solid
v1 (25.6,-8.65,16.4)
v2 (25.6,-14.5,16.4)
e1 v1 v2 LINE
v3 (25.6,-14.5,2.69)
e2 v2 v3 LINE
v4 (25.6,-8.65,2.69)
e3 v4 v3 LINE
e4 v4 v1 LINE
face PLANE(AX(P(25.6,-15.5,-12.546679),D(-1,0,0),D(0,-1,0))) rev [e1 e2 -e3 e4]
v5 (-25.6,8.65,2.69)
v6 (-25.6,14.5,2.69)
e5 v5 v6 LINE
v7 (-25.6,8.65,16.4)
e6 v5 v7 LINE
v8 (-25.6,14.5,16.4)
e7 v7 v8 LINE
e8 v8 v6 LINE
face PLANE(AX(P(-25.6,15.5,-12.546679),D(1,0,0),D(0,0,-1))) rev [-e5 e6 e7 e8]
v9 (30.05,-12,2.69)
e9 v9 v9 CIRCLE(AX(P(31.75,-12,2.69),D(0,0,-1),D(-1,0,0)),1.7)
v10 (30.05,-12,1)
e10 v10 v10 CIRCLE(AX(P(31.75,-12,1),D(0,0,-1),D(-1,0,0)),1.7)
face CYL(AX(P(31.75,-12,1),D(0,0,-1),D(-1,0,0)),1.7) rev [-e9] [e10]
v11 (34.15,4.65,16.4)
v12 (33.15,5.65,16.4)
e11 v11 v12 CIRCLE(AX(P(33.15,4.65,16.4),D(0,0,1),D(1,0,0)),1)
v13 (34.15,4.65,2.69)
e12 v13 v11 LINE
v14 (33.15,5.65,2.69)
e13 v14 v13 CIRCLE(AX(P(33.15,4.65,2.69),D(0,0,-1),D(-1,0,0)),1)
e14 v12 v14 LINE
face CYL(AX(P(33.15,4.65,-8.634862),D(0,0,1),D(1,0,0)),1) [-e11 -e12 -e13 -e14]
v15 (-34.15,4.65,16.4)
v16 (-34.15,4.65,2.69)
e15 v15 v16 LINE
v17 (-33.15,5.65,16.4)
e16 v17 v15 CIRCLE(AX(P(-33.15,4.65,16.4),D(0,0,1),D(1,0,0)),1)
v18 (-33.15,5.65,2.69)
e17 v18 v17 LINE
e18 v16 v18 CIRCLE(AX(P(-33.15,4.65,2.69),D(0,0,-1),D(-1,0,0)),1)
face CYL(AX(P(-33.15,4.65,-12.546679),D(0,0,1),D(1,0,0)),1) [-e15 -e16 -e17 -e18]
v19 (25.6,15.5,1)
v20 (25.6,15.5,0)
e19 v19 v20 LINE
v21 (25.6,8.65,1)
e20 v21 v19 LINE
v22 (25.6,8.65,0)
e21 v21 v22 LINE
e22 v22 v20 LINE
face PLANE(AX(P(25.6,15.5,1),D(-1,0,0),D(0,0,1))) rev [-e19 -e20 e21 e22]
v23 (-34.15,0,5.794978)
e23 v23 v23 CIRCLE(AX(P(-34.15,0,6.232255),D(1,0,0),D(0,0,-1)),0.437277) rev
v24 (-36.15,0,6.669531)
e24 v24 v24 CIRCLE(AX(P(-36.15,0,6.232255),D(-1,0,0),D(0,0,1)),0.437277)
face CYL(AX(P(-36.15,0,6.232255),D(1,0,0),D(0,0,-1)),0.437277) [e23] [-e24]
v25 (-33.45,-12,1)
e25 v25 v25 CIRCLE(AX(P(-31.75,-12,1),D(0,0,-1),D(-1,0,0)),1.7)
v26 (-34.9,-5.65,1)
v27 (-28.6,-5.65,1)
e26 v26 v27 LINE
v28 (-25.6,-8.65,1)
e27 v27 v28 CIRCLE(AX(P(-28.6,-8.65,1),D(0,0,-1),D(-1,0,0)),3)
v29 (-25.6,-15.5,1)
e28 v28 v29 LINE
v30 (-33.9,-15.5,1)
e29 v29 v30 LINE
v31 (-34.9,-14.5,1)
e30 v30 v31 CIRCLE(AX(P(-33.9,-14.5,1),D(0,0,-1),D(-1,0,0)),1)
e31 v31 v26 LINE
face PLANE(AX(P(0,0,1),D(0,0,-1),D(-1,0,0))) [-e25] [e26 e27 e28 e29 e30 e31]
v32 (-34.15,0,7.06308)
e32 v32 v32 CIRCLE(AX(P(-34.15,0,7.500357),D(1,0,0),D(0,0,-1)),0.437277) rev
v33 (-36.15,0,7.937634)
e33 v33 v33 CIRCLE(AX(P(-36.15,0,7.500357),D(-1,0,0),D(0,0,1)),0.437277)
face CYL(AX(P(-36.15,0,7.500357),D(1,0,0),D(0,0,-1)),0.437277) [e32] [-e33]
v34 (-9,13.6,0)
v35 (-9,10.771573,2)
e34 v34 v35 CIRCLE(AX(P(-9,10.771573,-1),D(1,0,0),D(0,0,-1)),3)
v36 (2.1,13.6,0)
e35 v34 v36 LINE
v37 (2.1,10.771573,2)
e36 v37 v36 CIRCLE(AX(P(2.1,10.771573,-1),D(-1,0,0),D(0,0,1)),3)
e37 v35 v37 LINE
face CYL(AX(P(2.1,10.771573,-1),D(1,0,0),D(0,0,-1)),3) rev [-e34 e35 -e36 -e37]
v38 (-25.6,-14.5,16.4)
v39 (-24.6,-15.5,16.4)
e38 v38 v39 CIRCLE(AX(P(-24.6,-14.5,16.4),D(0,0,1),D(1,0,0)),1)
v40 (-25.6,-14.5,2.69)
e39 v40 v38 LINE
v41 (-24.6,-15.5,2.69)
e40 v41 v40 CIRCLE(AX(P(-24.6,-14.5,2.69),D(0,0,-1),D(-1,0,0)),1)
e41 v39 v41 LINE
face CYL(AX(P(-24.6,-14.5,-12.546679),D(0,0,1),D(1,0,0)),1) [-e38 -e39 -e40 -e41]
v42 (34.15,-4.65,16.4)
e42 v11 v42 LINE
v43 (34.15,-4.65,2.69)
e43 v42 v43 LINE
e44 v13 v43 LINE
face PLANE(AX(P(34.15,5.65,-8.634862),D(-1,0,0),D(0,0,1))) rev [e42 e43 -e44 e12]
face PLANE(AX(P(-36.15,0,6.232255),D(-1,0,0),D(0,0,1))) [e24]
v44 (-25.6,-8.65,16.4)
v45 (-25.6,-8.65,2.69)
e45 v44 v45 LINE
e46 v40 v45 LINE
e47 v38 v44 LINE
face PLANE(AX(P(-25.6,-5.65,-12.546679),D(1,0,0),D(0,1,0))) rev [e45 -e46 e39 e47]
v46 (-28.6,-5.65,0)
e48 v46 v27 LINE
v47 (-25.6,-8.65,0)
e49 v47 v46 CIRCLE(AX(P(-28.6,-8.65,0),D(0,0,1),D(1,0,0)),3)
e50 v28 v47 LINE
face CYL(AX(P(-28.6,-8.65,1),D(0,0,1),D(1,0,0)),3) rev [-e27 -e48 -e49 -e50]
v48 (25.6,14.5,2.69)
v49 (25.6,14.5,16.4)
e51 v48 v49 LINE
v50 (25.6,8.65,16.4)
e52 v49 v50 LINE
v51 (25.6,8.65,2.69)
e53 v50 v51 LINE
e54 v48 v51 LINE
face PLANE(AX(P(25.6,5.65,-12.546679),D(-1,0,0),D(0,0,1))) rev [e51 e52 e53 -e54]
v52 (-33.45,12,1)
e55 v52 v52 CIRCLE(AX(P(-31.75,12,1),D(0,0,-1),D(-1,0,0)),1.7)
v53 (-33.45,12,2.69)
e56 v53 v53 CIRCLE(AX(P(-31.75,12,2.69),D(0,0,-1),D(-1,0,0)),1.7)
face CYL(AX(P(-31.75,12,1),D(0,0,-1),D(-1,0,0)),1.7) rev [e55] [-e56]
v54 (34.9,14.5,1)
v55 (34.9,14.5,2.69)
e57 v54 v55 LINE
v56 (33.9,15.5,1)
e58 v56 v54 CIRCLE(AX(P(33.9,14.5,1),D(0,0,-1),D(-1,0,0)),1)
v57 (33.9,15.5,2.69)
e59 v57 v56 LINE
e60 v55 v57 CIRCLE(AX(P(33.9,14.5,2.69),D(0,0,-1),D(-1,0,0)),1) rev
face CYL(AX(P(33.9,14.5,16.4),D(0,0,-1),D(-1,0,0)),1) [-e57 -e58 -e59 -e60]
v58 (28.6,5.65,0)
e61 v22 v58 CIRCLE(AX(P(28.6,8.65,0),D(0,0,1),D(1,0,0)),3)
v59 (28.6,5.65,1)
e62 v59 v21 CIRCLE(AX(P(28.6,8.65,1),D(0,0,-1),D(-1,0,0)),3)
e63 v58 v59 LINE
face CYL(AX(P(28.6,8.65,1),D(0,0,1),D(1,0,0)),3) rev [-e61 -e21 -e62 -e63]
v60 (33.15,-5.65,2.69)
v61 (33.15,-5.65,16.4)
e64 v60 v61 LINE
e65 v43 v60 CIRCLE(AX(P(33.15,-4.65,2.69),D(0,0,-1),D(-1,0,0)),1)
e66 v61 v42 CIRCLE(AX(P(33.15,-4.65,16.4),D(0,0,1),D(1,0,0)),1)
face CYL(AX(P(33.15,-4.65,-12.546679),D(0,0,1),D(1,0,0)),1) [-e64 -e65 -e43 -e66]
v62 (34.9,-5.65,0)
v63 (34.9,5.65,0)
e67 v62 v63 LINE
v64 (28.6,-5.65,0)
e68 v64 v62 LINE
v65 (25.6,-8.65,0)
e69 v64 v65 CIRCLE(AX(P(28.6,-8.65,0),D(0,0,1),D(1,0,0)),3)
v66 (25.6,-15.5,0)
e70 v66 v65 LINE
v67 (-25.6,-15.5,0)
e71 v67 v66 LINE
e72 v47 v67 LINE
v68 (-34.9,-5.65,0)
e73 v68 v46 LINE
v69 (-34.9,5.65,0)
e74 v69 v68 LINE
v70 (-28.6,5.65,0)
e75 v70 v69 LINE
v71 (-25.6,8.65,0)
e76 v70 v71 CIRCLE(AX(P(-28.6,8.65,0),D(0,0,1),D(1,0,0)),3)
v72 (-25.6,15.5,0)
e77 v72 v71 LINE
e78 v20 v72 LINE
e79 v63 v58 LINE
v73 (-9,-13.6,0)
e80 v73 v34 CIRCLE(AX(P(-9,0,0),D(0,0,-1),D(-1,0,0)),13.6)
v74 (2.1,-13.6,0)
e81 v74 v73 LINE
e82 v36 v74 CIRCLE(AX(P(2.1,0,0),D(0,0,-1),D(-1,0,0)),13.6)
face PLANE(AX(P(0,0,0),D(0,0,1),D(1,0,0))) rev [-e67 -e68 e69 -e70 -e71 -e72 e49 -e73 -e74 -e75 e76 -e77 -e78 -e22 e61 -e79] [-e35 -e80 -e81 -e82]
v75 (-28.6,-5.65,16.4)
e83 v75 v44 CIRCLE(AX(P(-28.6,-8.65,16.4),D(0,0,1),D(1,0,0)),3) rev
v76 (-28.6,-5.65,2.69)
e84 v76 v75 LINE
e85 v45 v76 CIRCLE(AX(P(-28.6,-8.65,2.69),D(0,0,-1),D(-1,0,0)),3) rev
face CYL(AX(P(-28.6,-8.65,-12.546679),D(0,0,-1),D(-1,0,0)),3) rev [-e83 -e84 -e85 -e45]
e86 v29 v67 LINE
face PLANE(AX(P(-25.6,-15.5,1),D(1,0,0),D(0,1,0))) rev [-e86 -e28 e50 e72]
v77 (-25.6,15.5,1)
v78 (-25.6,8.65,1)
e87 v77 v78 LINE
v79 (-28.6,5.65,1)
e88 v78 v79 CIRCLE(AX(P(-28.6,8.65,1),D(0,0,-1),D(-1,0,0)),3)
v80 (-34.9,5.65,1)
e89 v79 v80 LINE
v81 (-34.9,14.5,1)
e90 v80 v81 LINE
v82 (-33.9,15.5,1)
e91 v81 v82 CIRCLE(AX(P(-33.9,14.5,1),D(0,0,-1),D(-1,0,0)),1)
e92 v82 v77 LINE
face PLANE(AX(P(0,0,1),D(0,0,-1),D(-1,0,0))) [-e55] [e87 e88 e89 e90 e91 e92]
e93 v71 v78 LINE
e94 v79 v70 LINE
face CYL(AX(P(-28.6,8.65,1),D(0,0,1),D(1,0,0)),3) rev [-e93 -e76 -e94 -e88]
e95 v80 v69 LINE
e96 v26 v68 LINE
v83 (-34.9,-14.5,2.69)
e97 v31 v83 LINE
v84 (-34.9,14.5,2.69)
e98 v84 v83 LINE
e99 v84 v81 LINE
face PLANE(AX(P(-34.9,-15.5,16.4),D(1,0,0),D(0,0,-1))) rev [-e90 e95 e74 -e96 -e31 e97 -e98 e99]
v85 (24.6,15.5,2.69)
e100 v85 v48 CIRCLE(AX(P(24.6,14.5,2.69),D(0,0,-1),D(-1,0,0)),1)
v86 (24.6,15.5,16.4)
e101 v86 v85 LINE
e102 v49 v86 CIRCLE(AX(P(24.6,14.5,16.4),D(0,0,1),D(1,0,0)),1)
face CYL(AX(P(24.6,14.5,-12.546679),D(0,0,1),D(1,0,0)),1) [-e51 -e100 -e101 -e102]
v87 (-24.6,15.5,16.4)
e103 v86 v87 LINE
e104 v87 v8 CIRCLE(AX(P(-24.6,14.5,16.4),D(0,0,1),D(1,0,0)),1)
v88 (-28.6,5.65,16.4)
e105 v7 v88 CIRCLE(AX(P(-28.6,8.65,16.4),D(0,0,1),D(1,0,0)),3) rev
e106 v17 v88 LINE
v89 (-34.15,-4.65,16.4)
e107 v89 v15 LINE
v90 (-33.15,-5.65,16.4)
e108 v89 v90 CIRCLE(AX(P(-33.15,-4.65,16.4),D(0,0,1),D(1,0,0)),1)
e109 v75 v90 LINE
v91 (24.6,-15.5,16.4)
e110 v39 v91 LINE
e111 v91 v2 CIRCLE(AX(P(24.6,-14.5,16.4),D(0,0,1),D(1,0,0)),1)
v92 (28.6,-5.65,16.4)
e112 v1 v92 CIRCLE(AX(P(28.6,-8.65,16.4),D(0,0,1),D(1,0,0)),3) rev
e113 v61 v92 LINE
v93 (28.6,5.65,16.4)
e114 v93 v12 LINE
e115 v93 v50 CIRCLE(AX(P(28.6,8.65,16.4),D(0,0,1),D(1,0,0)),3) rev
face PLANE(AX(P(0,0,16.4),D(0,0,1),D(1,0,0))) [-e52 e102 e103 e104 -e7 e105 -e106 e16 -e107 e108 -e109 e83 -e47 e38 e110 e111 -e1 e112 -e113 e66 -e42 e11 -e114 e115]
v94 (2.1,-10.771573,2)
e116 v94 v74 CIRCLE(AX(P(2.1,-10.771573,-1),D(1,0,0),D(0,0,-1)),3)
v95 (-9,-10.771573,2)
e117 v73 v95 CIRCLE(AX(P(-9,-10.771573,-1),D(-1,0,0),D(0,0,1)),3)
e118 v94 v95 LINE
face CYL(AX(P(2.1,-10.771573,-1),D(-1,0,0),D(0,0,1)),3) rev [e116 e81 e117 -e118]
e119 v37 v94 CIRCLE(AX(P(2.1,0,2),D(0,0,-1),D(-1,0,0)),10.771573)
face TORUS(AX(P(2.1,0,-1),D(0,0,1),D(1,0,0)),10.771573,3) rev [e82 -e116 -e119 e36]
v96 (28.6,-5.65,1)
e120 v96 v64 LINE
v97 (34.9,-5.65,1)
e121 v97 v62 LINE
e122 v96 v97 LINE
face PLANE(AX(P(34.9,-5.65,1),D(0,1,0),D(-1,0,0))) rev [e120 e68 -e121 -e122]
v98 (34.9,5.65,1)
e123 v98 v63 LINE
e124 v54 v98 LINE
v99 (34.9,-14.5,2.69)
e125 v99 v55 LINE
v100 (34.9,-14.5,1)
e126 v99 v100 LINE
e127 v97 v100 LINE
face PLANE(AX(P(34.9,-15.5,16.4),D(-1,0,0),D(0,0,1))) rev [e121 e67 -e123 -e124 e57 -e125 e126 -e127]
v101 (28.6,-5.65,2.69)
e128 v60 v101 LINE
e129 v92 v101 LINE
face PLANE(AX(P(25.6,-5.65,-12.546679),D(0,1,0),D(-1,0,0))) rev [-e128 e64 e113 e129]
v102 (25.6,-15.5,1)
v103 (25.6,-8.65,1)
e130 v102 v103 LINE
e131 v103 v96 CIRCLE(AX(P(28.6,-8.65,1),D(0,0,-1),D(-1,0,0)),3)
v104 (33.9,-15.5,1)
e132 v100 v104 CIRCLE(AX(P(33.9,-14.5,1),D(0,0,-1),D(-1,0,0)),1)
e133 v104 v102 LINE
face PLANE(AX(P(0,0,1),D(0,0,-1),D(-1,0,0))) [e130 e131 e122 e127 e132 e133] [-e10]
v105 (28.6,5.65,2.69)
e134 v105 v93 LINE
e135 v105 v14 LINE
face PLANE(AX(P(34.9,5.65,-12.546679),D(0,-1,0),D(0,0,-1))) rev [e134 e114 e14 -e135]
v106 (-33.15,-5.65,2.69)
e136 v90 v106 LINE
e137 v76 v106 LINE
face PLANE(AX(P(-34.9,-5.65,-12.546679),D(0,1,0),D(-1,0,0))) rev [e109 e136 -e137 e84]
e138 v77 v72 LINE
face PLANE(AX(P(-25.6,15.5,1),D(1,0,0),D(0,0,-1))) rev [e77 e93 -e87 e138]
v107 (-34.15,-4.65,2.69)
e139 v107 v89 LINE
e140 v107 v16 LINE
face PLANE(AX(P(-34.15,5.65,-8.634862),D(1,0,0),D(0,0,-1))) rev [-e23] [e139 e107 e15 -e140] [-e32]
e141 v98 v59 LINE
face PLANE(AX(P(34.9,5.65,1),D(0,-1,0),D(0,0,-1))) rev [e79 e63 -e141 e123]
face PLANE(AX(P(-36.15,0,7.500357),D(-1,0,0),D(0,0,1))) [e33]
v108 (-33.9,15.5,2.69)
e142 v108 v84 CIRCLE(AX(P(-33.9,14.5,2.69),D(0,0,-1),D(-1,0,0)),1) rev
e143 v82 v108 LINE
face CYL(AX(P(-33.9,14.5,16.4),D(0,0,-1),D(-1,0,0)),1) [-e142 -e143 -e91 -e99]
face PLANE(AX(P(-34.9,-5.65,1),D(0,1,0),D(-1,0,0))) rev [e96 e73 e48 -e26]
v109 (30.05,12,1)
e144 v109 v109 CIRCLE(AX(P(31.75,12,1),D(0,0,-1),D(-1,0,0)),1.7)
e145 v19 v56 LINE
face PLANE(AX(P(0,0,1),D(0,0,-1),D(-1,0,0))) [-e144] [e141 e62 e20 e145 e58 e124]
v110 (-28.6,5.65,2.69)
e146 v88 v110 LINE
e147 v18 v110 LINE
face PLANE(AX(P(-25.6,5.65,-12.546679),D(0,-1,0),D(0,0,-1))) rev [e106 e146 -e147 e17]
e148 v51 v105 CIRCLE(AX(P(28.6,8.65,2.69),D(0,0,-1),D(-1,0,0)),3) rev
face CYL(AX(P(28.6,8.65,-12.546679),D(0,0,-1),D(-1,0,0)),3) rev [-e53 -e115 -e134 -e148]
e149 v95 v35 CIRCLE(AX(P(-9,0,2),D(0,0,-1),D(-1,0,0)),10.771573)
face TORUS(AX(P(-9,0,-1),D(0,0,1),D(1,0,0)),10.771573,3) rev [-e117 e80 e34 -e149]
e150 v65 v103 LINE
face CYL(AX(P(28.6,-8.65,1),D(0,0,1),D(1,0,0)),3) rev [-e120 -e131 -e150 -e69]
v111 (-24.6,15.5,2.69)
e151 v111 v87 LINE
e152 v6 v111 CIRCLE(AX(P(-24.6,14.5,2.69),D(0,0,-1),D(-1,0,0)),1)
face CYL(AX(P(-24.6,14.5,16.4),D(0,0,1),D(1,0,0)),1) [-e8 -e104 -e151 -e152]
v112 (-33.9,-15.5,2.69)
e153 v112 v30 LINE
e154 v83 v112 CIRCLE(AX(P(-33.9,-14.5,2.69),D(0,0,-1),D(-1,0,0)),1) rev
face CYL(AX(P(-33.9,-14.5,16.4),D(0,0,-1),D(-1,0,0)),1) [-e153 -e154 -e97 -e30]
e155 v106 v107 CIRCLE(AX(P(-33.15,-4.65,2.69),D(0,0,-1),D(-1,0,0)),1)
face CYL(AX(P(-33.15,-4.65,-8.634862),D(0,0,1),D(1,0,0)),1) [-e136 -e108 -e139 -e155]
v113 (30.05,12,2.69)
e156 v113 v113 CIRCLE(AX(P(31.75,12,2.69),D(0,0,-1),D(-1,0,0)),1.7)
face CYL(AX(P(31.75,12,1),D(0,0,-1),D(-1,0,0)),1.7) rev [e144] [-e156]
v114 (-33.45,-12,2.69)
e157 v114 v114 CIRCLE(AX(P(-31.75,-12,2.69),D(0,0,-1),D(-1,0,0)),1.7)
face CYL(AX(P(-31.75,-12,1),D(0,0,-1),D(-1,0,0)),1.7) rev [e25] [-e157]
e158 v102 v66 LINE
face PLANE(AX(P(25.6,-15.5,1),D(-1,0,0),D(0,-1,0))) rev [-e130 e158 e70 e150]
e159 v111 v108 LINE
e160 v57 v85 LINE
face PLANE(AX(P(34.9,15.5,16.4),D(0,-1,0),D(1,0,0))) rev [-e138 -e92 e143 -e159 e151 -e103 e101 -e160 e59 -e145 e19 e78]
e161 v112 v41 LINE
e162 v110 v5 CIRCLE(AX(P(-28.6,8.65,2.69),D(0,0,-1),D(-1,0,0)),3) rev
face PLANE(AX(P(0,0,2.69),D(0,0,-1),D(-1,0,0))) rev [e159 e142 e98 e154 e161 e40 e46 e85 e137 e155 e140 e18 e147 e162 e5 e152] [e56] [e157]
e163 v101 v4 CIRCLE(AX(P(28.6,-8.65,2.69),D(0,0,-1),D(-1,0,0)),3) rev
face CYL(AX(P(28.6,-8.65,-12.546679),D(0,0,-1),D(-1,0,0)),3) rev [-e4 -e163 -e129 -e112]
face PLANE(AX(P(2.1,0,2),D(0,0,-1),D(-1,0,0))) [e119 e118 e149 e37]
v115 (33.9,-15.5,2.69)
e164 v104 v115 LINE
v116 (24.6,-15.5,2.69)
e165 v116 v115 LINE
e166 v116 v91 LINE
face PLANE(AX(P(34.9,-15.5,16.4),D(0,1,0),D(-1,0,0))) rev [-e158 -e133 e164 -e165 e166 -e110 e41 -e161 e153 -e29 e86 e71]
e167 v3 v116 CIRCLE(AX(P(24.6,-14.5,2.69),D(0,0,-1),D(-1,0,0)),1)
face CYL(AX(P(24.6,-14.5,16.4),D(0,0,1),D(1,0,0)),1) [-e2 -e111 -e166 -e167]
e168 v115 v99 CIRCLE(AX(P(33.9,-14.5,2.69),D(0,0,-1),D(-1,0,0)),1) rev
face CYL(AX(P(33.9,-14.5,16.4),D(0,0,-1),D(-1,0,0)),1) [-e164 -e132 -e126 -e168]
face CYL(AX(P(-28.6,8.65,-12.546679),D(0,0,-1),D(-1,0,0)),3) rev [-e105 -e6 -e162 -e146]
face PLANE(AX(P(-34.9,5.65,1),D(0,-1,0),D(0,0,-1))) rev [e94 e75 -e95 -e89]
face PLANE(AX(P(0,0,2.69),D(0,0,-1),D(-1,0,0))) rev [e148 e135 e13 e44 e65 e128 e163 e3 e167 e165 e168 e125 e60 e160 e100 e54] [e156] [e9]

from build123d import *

# Parameters (mm, degrees)
SKETCH_1_W          = 69.8
SKETCH_1_H          = 31
EXTRUDE_1_DEPTH     = 16.4
SKETCH_2_W          = 9.3
SKETCH_2_H          = 9.85
CUT_EXTRUDE_1_DEPTH = 1
SKETCH_3_W          = 9.3
SKETCH_3_H          = 9.85
CUT_EXTRUDE_2_DEPTH = 13.71
CUT_EXTRUDE_3_DEPTH = 2
HOLE_WIZARD_M3_1_D  = 3.4
SKETCH_8_W          = 0.75
SKETCH_8_H          = 11.3
CUT_EXTRUDE_5_DEPTH = 13.71
SKETCH_9_R          = 0.437276748
EXTRUDE_3_DEPTH     = 2
FILLET_1_R          = 3
FILLET_2_R          = 1


with BuildPart() as part:
    # 草图1 → 凸台-拉伸1 (new body)
    with BuildSketch(Plane.XY):
        Rectangle(SKETCH_1_W, SKETCH_1_H)
    extrude(amount=EXTRUDE_1_DEPTH)

    # 草图2 → 切除-拉伸1 (cut)
    with BuildSketch(Plane(origin=(0, 0, 0), x_dir=(-1, 0, 0), z_dir=(0, 0, -1))):
        with Locations((-30.25, 10.575)):
            Rectangle(SKETCH_2_W, SKETCH_2_H)
        with Locations((-30.25, -10.575)):
            Rectangle(SKETCH_2_W, SKETCH_2_H)
        with Locations((30.25, -10.575)):
            Rectangle(SKETCH_2_W, SKETCH_2_H)
        with Locations((30.25, 10.575)):
            Rectangle(SKETCH_2_W, SKETCH_2_H)
    extrude(amount=-CUT_EXTRUDE_1_DEPTH, mode=Mode.SUBTRACT)

    # 草图3 → 切除-拉伸2 (cut)
    with BuildSketch(Plane.XY.offset(16.4)):
        with Locations((30.25, -10.575)):
            Rectangle(SKETCH_3_W, SKETCH_3_H)
        with Locations((-30.25, -10.575)):
            Rectangle(SKETCH_3_W, SKETCH_3_H)
        with Locations((30.25, 10.575)):
            Rectangle(SKETCH_3_W, SKETCH_3_H)
        with Locations((-30.25, 10.575)):
            Rectangle(SKETCH_3_W, SKETCH_3_H)
    extrude(amount=-CUT_EXTRUDE_2_DEPTH, mode=Mode.SUBTRACT)

    # 草图4 → 切除-拉伸3 (cut)
    with BuildSketch(Plane(origin=(0, 0, 0), x_dir=(-1, 0, 0), z_dir=(0, 0, -1))):
        with BuildLine():
            Line((-2.1, 13.6), (9, 13.6))
            ThreePointArc((9, 13.6), (22.6, 0), (9, -13.6))
            Line((9, -13.6), (-2.1, -13.6))
            ThreePointArc((-2.1, -13.6), (-15.7, 0), (-2.1, 13.6))
        make_face()
    extrude(amount=-CUT_EXTRUDE_3_DEPTH, mode=Mode.SUBTRACT)

    # M3 间隙孔1 (through all)
    with Locations(Plane(origin=(0, 0, 1), x_dir=(-1, 0, 0), z_dir=(0, 0, -1))):
        with Locations((31.75, 12), (31.75, -12), (-31.75, -12), (-31.75, 12)):
            Hole(HOLE_WIZARD_M3_1_D / 2)

    # 草图8 → 切除-拉伸5 (cut)
    with BuildSketch(Plane.XY.offset(16.4)):
        with Locations((-34.525, 0)):
            Rectangle(SKETCH_8_W, SKETCH_8_H)
        with Locations((34.525, 0)):
            Rectangle(SKETCH_8_W, SKETCH_8_H)
    extrude(amount=-CUT_EXTRUDE_5_DEPTH, mode=Mode.SUBTRACT)

    # 草图9 → 凸台-拉伸3 (add)
    with BuildSketch(Plane.ZY.offset(34.15)):
        with Locations(Location((6.232254634, 0, 0), (0, 0, 180))):
            Circle(SKETCH_9_R)
        with Locations(Location((7.500357203, 0, 0), (0, 0, 180))):
            Circle(SKETCH_9_R)
    extrude(amount=EXTRUDE_3_DEPTH)

    # 圆角1
    # the kernel refuses this fillet: 3 mm, written as the material it adds along each edge
    with BuildSketch(Plane(origin=(-9, -13.6, 2), x_dir=(0, 0, -1), z_dir=(1, 0, 0)), Plane(origin=(2.1, 13.6, 2), x_dir=(0, 0, -1), z_dir=(-1, 0, 0))) as fillet_1_piece_1:
        with BuildLine():
            CenterArc((3, 2.828427125), FILLET_1_R, 180, 70.528779366)
            Line((0, 2.828427125), (-0.06, 2.828427125))
            Line((-0.06, 2.828427125), (-0.06, 0))
            Line((-0.06, 0), (0, -0.06))
            ThreePointArc((0, -0.06), (1, -0.06), (1.98, -0.056568542))
            Line((1.98, -0.056568542), (2, 0))
        make_face()
    extrude(amount=11.1)
    with BuildSketch(Plane(origin=(2.1, 0, 2), x_dir=(0, -1, 0), z_dir=(-1, 0, 0))) as fillet_1_piece_2:
        with BuildLine():
            CenterArc((10.771572875, -3), FILLET_1_R, 19.471220634, 70.528779366)
            Line((10.771572875, 0), (10.771572875, 0.06))
            Line((10.771572875, 0.06), (13.6, 0.06))
            Line((13.6, 0.06), (13.66, 0))
            ThreePointArc((13.66, 0), (13.66, -1), (13.656568542, -1.98))
            Line((13.656568542, -1.98), (13.6, -2))
        make_face()
    revolve(axis=Axis((2.1, 0, 2), (0, 0, 1)), revolution_arc=180)
    with BuildSketch(Plane(origin=(-9, 0, 2), x_dir=(0, 1, 0), z_dir=(1, 0, 0))) as fillet_1_piece_3:
        with BuildLine():
            CenterArc((10.771572875, -3), FILLET_1_R, 19.471220634, 70.528779366)
            Line((10.771572875, 0), (10.771572875, 0.06))
            Line((10.771572875, 0.06), (13.6, 0.06))
            Line((13.6, 0.06), (13.66, 0))
            ThreePointArc((13.66, 0), (13.66, -1), (13.656568542, -1.98))
            Line((13.656568542, -1.98), (13.6, -2))
        make_face()
    revolve(axis=Axis((-9, 0, 2), (0, 0, 1)), revolution_arc=180)
    with BuildSketch(Plane(origin=(-25.6, -5.65, 0), x_dir=(0, -1, 0), z_dir=(0, 0, 1)), Plane(origin=(-25.6, 5.65, 0), x_dir=(-1, 0, 0), z_dir=(0, 0, 1))) as fillet_1_piece_4:
        with BuildLine():
            CenterArc((FILLET_1_R, -FILLET_1_R), FILLET_1_R, 90, 90)
            Line((0, -FILLET_1_R), (-FILLET_1_R * 0.02, -FILLET_1_R))
            Line((-FILLET_1_R * 0.02, -FILLET_1_R), (-FILLET_1_R * 0.02, FILLET_1_R * 0.02))
            Line((-FILLET_1_R * 0.02, FILLET_1_R * 0.02), (FILLET_1_R, FILLET_1_R * 0.02))
            Line((FILLET_1_R, FILLET_1_R * 0.02), (FILLET_1_R, 0))
        make_face()
    extrude(amount=8.5)
    with BuildSketch(Plane(origin=(25.6, -5.65, 0), x_dir=(0, -1, 0), z_dir=(0, 0, 1)), Plane(origin=(25.6, 5.65, 0), x_dir=(1, 0, 0), z_dir=(0, 0, 1))) as fillet_1_piece_5:
        with BuildLine():
            CenterArc((FILLET_1_R, FILLET_1_R), FILLET_1_R, 180, 90)
            Line((0, FILLET_1_R), (-FILLET_1_R * 0.02, FILLET_1_R))
            Line((-FILLET_1_R * 0.02, FILLET_1_R), (-FILLET_1_R * 0.02, -FILLET_1_R * 0.02))
            Line((-FILLET_1_R * 0.02, -FILLET_1_R * 0.02), (FILLET_1_R, -FILLET_1_R * 0.02))
            Line((FILLET_1_R, -FILLET_1_R * 0.02), (FILLET_1_R, 0))
        make_face()
    extrude(amount=8.5)
    with BuildSketch(Plane(origin=(-25.6, 5.65, 16.4), x_dir=(-1, 0, 0), z_dir=(0, 0, -1))) as fillet_1_piece_6_section:
        with BuildLine():
            CenterArc((FILLET_1_R, FILLET_1_R), FILLET_1_R, 180, 90)
            Line((0, FILLET_1_R), (-FILLET_1_R * 0.02, FILLET_1_R))
            Line((-FILLET_1_R * 0.02, FILLET_1_R), (-FILLET_1_R * 0.02, -FILLET_1_R * 0.02))
            Line((-FILLET_1_R * 0.02, -FILLET_1_R * 0.02), (FILLET_1_R, -FILLET_1_R * 0.02))
            Line((FILLET_1_R, -FILLET_1_R * 0.02), (FILLET_1_R, 0))
        make_face()
    fillet_1_piece_6 = extrude(amount=21.21, mode=Mode.PRIVATE)
    fillet_1_piece_6 = split(fillet_1_piece_6, bisect_by=Plane(origin=(-26.279185343, 6.329185343, 0), z_dir=(0, 0, 1)), keep=Keep.TOP, mode=Mode.PRIVATE)
    add(fillet_1_piece_6)
    with BuildSketch(Plane(origin=(25.6, 5.65, 16.4), x_dir=(1, 0, 0), z_dir=(0, 0, -1))) as fillet_1_piece_7_section:
        with BuildLine():
            CenterArc((FILLET_1_R, -FILLET_1_R), FILLET_1_R, 90, 90)
            Line((0, -FILLET_1_R), (-FILLET_1_R * 0.02, -FILLET_1_R))
            Line((-FILLET_1_R * 0.02, -FILLET_1_R), (-FILLET_1_R * 0.02, FILLET_1_R * 0.02))
            Line((-FILLET_1_R * 0.02, FILLET_1_R * 0.02), (FILLET_1_R, FILLET_1_R * 0.02))
            Line((FILLET_1_R, FILLET_1_R * 0.02), (FILLET_1_R, 0))
        make_face()
    fillet_1_piece_7 = extrude(amount=21.21, mode=Mode.PRIVATE)
    fillet_1_piece_7 = split(fillet_1_piece_7, bisect_by=Plane(origin=(26.279185343, 6.329185343, 0), z_dir=(0, 0, 1)), keep=Keep.TOP, mode=Mode.PRIVATE)
    add(fillet_1_piece_7)
    with BuildSketch(Plane(origin=(25.6, -5.65, 16.4), x_dir=(0, -1, 0), z_dir=(0, 0, -1))) as fillet_1_piece_8_section:
        with BuildLine():
            CenterArc((FILLET_1_R, -FILLET_1_R), FILLET_1_R, 90, 90)
            Line((0, -FILLET_1_R), (-FILLET_1_R * 0.02, -FILLET_1_R))
            Line((-FILLET_1_R * 0.02, -FILLET_1_R), (-FILLET_1_R * 0.02, FILLET_1_R * 0.02))
            Line((-FILLET_1_R * 0.02, FILLET_1_R * 0.02), (FILLET_1_R, FILLET_1_R * 0.02))
            Line((FILLET_1_R, FILLET_1_R * 0.02), (FILLET_1_R, 0))
        make_face()
    fillet_1_piece_8 = extrude(amount=21.21, mode=Mode.PRIVATE)
    fillet_1_piece_8 = split(fillet_1_piece_8, bisect_by=Plane(origin=(26.279185343, -6.329185343, 0), z_dir=(0, 0, 1)), keep=Keep.TOP, mode=Mode.PRIVATE)
    add(fillet_1_piece_8)
    with BuildSketch(Plane(origin=(-25.6, -5.65, 16.4), x_dir=(0, -1, 0), z_dir=(0, 0, -1))) as fillet_1_piece_9_section:
        with BuildLine():
            CenterArc((FILLET_1_R, FILLET_1_R), FILLET_1_R, 180, 90)
            Line((0, FILLET_1_R), (-FILLET_1_R * 0.02, FILLET_1_R))
            Line((-FILLET_1_R * 0.02, FILLET_1_R), (-FILLET_1_R * 0.02, -FILLET_1_R * 0.02))
            Line((-FILLET_1_R * 0.02, -FILLET_1_R * 0.02), (FILLET_1_R, -FILLET_1_R * 0.02))
            Line((FILLET_1_R, -FILLET_1_R * 0.02), (FILLET_1_R, 0))
        make_face()
    fillet_1_piece_9 = extrude(amount=21.21, mode=Mode.PRIVATE)
    fillet_1_piece_9 = split(fillet_1_piece_9, bisect_by=Plane(origin=(-26.279185343, -6.329185343, 0), z_dir=(0, 0, 1)), keep=Keep.TOP, mode=Mode.PRIVATE)
    add(fillet_1_piece_9)

    # 圆角2
    fillet_2_edges = [part.edges().sort_by_distance(p)[0] for p in [
        (-25.6, 15.5, 9.545),
        (-34.15, -5.65, 9.545),
        (-34.15, 5.65, 9.545),
        (34.15, 5.65, 9.545),
        (34.15, -5.65, 9.545),
        (34.9, -15.5, 1.845),
        (25.6, -15.5, 9.545),
        (-34.9, 15.5, 1.845),
        (34.9, 15.5, 1.845),
        (-34.9, -15.5, 1.845),
        (25.6, 15.5, 9.545),
        (-25.6, -15.5, 9.545),
    ]]
    fillet(fillet_2_edges, radius=FILLET_2_R)


solid = part.part
